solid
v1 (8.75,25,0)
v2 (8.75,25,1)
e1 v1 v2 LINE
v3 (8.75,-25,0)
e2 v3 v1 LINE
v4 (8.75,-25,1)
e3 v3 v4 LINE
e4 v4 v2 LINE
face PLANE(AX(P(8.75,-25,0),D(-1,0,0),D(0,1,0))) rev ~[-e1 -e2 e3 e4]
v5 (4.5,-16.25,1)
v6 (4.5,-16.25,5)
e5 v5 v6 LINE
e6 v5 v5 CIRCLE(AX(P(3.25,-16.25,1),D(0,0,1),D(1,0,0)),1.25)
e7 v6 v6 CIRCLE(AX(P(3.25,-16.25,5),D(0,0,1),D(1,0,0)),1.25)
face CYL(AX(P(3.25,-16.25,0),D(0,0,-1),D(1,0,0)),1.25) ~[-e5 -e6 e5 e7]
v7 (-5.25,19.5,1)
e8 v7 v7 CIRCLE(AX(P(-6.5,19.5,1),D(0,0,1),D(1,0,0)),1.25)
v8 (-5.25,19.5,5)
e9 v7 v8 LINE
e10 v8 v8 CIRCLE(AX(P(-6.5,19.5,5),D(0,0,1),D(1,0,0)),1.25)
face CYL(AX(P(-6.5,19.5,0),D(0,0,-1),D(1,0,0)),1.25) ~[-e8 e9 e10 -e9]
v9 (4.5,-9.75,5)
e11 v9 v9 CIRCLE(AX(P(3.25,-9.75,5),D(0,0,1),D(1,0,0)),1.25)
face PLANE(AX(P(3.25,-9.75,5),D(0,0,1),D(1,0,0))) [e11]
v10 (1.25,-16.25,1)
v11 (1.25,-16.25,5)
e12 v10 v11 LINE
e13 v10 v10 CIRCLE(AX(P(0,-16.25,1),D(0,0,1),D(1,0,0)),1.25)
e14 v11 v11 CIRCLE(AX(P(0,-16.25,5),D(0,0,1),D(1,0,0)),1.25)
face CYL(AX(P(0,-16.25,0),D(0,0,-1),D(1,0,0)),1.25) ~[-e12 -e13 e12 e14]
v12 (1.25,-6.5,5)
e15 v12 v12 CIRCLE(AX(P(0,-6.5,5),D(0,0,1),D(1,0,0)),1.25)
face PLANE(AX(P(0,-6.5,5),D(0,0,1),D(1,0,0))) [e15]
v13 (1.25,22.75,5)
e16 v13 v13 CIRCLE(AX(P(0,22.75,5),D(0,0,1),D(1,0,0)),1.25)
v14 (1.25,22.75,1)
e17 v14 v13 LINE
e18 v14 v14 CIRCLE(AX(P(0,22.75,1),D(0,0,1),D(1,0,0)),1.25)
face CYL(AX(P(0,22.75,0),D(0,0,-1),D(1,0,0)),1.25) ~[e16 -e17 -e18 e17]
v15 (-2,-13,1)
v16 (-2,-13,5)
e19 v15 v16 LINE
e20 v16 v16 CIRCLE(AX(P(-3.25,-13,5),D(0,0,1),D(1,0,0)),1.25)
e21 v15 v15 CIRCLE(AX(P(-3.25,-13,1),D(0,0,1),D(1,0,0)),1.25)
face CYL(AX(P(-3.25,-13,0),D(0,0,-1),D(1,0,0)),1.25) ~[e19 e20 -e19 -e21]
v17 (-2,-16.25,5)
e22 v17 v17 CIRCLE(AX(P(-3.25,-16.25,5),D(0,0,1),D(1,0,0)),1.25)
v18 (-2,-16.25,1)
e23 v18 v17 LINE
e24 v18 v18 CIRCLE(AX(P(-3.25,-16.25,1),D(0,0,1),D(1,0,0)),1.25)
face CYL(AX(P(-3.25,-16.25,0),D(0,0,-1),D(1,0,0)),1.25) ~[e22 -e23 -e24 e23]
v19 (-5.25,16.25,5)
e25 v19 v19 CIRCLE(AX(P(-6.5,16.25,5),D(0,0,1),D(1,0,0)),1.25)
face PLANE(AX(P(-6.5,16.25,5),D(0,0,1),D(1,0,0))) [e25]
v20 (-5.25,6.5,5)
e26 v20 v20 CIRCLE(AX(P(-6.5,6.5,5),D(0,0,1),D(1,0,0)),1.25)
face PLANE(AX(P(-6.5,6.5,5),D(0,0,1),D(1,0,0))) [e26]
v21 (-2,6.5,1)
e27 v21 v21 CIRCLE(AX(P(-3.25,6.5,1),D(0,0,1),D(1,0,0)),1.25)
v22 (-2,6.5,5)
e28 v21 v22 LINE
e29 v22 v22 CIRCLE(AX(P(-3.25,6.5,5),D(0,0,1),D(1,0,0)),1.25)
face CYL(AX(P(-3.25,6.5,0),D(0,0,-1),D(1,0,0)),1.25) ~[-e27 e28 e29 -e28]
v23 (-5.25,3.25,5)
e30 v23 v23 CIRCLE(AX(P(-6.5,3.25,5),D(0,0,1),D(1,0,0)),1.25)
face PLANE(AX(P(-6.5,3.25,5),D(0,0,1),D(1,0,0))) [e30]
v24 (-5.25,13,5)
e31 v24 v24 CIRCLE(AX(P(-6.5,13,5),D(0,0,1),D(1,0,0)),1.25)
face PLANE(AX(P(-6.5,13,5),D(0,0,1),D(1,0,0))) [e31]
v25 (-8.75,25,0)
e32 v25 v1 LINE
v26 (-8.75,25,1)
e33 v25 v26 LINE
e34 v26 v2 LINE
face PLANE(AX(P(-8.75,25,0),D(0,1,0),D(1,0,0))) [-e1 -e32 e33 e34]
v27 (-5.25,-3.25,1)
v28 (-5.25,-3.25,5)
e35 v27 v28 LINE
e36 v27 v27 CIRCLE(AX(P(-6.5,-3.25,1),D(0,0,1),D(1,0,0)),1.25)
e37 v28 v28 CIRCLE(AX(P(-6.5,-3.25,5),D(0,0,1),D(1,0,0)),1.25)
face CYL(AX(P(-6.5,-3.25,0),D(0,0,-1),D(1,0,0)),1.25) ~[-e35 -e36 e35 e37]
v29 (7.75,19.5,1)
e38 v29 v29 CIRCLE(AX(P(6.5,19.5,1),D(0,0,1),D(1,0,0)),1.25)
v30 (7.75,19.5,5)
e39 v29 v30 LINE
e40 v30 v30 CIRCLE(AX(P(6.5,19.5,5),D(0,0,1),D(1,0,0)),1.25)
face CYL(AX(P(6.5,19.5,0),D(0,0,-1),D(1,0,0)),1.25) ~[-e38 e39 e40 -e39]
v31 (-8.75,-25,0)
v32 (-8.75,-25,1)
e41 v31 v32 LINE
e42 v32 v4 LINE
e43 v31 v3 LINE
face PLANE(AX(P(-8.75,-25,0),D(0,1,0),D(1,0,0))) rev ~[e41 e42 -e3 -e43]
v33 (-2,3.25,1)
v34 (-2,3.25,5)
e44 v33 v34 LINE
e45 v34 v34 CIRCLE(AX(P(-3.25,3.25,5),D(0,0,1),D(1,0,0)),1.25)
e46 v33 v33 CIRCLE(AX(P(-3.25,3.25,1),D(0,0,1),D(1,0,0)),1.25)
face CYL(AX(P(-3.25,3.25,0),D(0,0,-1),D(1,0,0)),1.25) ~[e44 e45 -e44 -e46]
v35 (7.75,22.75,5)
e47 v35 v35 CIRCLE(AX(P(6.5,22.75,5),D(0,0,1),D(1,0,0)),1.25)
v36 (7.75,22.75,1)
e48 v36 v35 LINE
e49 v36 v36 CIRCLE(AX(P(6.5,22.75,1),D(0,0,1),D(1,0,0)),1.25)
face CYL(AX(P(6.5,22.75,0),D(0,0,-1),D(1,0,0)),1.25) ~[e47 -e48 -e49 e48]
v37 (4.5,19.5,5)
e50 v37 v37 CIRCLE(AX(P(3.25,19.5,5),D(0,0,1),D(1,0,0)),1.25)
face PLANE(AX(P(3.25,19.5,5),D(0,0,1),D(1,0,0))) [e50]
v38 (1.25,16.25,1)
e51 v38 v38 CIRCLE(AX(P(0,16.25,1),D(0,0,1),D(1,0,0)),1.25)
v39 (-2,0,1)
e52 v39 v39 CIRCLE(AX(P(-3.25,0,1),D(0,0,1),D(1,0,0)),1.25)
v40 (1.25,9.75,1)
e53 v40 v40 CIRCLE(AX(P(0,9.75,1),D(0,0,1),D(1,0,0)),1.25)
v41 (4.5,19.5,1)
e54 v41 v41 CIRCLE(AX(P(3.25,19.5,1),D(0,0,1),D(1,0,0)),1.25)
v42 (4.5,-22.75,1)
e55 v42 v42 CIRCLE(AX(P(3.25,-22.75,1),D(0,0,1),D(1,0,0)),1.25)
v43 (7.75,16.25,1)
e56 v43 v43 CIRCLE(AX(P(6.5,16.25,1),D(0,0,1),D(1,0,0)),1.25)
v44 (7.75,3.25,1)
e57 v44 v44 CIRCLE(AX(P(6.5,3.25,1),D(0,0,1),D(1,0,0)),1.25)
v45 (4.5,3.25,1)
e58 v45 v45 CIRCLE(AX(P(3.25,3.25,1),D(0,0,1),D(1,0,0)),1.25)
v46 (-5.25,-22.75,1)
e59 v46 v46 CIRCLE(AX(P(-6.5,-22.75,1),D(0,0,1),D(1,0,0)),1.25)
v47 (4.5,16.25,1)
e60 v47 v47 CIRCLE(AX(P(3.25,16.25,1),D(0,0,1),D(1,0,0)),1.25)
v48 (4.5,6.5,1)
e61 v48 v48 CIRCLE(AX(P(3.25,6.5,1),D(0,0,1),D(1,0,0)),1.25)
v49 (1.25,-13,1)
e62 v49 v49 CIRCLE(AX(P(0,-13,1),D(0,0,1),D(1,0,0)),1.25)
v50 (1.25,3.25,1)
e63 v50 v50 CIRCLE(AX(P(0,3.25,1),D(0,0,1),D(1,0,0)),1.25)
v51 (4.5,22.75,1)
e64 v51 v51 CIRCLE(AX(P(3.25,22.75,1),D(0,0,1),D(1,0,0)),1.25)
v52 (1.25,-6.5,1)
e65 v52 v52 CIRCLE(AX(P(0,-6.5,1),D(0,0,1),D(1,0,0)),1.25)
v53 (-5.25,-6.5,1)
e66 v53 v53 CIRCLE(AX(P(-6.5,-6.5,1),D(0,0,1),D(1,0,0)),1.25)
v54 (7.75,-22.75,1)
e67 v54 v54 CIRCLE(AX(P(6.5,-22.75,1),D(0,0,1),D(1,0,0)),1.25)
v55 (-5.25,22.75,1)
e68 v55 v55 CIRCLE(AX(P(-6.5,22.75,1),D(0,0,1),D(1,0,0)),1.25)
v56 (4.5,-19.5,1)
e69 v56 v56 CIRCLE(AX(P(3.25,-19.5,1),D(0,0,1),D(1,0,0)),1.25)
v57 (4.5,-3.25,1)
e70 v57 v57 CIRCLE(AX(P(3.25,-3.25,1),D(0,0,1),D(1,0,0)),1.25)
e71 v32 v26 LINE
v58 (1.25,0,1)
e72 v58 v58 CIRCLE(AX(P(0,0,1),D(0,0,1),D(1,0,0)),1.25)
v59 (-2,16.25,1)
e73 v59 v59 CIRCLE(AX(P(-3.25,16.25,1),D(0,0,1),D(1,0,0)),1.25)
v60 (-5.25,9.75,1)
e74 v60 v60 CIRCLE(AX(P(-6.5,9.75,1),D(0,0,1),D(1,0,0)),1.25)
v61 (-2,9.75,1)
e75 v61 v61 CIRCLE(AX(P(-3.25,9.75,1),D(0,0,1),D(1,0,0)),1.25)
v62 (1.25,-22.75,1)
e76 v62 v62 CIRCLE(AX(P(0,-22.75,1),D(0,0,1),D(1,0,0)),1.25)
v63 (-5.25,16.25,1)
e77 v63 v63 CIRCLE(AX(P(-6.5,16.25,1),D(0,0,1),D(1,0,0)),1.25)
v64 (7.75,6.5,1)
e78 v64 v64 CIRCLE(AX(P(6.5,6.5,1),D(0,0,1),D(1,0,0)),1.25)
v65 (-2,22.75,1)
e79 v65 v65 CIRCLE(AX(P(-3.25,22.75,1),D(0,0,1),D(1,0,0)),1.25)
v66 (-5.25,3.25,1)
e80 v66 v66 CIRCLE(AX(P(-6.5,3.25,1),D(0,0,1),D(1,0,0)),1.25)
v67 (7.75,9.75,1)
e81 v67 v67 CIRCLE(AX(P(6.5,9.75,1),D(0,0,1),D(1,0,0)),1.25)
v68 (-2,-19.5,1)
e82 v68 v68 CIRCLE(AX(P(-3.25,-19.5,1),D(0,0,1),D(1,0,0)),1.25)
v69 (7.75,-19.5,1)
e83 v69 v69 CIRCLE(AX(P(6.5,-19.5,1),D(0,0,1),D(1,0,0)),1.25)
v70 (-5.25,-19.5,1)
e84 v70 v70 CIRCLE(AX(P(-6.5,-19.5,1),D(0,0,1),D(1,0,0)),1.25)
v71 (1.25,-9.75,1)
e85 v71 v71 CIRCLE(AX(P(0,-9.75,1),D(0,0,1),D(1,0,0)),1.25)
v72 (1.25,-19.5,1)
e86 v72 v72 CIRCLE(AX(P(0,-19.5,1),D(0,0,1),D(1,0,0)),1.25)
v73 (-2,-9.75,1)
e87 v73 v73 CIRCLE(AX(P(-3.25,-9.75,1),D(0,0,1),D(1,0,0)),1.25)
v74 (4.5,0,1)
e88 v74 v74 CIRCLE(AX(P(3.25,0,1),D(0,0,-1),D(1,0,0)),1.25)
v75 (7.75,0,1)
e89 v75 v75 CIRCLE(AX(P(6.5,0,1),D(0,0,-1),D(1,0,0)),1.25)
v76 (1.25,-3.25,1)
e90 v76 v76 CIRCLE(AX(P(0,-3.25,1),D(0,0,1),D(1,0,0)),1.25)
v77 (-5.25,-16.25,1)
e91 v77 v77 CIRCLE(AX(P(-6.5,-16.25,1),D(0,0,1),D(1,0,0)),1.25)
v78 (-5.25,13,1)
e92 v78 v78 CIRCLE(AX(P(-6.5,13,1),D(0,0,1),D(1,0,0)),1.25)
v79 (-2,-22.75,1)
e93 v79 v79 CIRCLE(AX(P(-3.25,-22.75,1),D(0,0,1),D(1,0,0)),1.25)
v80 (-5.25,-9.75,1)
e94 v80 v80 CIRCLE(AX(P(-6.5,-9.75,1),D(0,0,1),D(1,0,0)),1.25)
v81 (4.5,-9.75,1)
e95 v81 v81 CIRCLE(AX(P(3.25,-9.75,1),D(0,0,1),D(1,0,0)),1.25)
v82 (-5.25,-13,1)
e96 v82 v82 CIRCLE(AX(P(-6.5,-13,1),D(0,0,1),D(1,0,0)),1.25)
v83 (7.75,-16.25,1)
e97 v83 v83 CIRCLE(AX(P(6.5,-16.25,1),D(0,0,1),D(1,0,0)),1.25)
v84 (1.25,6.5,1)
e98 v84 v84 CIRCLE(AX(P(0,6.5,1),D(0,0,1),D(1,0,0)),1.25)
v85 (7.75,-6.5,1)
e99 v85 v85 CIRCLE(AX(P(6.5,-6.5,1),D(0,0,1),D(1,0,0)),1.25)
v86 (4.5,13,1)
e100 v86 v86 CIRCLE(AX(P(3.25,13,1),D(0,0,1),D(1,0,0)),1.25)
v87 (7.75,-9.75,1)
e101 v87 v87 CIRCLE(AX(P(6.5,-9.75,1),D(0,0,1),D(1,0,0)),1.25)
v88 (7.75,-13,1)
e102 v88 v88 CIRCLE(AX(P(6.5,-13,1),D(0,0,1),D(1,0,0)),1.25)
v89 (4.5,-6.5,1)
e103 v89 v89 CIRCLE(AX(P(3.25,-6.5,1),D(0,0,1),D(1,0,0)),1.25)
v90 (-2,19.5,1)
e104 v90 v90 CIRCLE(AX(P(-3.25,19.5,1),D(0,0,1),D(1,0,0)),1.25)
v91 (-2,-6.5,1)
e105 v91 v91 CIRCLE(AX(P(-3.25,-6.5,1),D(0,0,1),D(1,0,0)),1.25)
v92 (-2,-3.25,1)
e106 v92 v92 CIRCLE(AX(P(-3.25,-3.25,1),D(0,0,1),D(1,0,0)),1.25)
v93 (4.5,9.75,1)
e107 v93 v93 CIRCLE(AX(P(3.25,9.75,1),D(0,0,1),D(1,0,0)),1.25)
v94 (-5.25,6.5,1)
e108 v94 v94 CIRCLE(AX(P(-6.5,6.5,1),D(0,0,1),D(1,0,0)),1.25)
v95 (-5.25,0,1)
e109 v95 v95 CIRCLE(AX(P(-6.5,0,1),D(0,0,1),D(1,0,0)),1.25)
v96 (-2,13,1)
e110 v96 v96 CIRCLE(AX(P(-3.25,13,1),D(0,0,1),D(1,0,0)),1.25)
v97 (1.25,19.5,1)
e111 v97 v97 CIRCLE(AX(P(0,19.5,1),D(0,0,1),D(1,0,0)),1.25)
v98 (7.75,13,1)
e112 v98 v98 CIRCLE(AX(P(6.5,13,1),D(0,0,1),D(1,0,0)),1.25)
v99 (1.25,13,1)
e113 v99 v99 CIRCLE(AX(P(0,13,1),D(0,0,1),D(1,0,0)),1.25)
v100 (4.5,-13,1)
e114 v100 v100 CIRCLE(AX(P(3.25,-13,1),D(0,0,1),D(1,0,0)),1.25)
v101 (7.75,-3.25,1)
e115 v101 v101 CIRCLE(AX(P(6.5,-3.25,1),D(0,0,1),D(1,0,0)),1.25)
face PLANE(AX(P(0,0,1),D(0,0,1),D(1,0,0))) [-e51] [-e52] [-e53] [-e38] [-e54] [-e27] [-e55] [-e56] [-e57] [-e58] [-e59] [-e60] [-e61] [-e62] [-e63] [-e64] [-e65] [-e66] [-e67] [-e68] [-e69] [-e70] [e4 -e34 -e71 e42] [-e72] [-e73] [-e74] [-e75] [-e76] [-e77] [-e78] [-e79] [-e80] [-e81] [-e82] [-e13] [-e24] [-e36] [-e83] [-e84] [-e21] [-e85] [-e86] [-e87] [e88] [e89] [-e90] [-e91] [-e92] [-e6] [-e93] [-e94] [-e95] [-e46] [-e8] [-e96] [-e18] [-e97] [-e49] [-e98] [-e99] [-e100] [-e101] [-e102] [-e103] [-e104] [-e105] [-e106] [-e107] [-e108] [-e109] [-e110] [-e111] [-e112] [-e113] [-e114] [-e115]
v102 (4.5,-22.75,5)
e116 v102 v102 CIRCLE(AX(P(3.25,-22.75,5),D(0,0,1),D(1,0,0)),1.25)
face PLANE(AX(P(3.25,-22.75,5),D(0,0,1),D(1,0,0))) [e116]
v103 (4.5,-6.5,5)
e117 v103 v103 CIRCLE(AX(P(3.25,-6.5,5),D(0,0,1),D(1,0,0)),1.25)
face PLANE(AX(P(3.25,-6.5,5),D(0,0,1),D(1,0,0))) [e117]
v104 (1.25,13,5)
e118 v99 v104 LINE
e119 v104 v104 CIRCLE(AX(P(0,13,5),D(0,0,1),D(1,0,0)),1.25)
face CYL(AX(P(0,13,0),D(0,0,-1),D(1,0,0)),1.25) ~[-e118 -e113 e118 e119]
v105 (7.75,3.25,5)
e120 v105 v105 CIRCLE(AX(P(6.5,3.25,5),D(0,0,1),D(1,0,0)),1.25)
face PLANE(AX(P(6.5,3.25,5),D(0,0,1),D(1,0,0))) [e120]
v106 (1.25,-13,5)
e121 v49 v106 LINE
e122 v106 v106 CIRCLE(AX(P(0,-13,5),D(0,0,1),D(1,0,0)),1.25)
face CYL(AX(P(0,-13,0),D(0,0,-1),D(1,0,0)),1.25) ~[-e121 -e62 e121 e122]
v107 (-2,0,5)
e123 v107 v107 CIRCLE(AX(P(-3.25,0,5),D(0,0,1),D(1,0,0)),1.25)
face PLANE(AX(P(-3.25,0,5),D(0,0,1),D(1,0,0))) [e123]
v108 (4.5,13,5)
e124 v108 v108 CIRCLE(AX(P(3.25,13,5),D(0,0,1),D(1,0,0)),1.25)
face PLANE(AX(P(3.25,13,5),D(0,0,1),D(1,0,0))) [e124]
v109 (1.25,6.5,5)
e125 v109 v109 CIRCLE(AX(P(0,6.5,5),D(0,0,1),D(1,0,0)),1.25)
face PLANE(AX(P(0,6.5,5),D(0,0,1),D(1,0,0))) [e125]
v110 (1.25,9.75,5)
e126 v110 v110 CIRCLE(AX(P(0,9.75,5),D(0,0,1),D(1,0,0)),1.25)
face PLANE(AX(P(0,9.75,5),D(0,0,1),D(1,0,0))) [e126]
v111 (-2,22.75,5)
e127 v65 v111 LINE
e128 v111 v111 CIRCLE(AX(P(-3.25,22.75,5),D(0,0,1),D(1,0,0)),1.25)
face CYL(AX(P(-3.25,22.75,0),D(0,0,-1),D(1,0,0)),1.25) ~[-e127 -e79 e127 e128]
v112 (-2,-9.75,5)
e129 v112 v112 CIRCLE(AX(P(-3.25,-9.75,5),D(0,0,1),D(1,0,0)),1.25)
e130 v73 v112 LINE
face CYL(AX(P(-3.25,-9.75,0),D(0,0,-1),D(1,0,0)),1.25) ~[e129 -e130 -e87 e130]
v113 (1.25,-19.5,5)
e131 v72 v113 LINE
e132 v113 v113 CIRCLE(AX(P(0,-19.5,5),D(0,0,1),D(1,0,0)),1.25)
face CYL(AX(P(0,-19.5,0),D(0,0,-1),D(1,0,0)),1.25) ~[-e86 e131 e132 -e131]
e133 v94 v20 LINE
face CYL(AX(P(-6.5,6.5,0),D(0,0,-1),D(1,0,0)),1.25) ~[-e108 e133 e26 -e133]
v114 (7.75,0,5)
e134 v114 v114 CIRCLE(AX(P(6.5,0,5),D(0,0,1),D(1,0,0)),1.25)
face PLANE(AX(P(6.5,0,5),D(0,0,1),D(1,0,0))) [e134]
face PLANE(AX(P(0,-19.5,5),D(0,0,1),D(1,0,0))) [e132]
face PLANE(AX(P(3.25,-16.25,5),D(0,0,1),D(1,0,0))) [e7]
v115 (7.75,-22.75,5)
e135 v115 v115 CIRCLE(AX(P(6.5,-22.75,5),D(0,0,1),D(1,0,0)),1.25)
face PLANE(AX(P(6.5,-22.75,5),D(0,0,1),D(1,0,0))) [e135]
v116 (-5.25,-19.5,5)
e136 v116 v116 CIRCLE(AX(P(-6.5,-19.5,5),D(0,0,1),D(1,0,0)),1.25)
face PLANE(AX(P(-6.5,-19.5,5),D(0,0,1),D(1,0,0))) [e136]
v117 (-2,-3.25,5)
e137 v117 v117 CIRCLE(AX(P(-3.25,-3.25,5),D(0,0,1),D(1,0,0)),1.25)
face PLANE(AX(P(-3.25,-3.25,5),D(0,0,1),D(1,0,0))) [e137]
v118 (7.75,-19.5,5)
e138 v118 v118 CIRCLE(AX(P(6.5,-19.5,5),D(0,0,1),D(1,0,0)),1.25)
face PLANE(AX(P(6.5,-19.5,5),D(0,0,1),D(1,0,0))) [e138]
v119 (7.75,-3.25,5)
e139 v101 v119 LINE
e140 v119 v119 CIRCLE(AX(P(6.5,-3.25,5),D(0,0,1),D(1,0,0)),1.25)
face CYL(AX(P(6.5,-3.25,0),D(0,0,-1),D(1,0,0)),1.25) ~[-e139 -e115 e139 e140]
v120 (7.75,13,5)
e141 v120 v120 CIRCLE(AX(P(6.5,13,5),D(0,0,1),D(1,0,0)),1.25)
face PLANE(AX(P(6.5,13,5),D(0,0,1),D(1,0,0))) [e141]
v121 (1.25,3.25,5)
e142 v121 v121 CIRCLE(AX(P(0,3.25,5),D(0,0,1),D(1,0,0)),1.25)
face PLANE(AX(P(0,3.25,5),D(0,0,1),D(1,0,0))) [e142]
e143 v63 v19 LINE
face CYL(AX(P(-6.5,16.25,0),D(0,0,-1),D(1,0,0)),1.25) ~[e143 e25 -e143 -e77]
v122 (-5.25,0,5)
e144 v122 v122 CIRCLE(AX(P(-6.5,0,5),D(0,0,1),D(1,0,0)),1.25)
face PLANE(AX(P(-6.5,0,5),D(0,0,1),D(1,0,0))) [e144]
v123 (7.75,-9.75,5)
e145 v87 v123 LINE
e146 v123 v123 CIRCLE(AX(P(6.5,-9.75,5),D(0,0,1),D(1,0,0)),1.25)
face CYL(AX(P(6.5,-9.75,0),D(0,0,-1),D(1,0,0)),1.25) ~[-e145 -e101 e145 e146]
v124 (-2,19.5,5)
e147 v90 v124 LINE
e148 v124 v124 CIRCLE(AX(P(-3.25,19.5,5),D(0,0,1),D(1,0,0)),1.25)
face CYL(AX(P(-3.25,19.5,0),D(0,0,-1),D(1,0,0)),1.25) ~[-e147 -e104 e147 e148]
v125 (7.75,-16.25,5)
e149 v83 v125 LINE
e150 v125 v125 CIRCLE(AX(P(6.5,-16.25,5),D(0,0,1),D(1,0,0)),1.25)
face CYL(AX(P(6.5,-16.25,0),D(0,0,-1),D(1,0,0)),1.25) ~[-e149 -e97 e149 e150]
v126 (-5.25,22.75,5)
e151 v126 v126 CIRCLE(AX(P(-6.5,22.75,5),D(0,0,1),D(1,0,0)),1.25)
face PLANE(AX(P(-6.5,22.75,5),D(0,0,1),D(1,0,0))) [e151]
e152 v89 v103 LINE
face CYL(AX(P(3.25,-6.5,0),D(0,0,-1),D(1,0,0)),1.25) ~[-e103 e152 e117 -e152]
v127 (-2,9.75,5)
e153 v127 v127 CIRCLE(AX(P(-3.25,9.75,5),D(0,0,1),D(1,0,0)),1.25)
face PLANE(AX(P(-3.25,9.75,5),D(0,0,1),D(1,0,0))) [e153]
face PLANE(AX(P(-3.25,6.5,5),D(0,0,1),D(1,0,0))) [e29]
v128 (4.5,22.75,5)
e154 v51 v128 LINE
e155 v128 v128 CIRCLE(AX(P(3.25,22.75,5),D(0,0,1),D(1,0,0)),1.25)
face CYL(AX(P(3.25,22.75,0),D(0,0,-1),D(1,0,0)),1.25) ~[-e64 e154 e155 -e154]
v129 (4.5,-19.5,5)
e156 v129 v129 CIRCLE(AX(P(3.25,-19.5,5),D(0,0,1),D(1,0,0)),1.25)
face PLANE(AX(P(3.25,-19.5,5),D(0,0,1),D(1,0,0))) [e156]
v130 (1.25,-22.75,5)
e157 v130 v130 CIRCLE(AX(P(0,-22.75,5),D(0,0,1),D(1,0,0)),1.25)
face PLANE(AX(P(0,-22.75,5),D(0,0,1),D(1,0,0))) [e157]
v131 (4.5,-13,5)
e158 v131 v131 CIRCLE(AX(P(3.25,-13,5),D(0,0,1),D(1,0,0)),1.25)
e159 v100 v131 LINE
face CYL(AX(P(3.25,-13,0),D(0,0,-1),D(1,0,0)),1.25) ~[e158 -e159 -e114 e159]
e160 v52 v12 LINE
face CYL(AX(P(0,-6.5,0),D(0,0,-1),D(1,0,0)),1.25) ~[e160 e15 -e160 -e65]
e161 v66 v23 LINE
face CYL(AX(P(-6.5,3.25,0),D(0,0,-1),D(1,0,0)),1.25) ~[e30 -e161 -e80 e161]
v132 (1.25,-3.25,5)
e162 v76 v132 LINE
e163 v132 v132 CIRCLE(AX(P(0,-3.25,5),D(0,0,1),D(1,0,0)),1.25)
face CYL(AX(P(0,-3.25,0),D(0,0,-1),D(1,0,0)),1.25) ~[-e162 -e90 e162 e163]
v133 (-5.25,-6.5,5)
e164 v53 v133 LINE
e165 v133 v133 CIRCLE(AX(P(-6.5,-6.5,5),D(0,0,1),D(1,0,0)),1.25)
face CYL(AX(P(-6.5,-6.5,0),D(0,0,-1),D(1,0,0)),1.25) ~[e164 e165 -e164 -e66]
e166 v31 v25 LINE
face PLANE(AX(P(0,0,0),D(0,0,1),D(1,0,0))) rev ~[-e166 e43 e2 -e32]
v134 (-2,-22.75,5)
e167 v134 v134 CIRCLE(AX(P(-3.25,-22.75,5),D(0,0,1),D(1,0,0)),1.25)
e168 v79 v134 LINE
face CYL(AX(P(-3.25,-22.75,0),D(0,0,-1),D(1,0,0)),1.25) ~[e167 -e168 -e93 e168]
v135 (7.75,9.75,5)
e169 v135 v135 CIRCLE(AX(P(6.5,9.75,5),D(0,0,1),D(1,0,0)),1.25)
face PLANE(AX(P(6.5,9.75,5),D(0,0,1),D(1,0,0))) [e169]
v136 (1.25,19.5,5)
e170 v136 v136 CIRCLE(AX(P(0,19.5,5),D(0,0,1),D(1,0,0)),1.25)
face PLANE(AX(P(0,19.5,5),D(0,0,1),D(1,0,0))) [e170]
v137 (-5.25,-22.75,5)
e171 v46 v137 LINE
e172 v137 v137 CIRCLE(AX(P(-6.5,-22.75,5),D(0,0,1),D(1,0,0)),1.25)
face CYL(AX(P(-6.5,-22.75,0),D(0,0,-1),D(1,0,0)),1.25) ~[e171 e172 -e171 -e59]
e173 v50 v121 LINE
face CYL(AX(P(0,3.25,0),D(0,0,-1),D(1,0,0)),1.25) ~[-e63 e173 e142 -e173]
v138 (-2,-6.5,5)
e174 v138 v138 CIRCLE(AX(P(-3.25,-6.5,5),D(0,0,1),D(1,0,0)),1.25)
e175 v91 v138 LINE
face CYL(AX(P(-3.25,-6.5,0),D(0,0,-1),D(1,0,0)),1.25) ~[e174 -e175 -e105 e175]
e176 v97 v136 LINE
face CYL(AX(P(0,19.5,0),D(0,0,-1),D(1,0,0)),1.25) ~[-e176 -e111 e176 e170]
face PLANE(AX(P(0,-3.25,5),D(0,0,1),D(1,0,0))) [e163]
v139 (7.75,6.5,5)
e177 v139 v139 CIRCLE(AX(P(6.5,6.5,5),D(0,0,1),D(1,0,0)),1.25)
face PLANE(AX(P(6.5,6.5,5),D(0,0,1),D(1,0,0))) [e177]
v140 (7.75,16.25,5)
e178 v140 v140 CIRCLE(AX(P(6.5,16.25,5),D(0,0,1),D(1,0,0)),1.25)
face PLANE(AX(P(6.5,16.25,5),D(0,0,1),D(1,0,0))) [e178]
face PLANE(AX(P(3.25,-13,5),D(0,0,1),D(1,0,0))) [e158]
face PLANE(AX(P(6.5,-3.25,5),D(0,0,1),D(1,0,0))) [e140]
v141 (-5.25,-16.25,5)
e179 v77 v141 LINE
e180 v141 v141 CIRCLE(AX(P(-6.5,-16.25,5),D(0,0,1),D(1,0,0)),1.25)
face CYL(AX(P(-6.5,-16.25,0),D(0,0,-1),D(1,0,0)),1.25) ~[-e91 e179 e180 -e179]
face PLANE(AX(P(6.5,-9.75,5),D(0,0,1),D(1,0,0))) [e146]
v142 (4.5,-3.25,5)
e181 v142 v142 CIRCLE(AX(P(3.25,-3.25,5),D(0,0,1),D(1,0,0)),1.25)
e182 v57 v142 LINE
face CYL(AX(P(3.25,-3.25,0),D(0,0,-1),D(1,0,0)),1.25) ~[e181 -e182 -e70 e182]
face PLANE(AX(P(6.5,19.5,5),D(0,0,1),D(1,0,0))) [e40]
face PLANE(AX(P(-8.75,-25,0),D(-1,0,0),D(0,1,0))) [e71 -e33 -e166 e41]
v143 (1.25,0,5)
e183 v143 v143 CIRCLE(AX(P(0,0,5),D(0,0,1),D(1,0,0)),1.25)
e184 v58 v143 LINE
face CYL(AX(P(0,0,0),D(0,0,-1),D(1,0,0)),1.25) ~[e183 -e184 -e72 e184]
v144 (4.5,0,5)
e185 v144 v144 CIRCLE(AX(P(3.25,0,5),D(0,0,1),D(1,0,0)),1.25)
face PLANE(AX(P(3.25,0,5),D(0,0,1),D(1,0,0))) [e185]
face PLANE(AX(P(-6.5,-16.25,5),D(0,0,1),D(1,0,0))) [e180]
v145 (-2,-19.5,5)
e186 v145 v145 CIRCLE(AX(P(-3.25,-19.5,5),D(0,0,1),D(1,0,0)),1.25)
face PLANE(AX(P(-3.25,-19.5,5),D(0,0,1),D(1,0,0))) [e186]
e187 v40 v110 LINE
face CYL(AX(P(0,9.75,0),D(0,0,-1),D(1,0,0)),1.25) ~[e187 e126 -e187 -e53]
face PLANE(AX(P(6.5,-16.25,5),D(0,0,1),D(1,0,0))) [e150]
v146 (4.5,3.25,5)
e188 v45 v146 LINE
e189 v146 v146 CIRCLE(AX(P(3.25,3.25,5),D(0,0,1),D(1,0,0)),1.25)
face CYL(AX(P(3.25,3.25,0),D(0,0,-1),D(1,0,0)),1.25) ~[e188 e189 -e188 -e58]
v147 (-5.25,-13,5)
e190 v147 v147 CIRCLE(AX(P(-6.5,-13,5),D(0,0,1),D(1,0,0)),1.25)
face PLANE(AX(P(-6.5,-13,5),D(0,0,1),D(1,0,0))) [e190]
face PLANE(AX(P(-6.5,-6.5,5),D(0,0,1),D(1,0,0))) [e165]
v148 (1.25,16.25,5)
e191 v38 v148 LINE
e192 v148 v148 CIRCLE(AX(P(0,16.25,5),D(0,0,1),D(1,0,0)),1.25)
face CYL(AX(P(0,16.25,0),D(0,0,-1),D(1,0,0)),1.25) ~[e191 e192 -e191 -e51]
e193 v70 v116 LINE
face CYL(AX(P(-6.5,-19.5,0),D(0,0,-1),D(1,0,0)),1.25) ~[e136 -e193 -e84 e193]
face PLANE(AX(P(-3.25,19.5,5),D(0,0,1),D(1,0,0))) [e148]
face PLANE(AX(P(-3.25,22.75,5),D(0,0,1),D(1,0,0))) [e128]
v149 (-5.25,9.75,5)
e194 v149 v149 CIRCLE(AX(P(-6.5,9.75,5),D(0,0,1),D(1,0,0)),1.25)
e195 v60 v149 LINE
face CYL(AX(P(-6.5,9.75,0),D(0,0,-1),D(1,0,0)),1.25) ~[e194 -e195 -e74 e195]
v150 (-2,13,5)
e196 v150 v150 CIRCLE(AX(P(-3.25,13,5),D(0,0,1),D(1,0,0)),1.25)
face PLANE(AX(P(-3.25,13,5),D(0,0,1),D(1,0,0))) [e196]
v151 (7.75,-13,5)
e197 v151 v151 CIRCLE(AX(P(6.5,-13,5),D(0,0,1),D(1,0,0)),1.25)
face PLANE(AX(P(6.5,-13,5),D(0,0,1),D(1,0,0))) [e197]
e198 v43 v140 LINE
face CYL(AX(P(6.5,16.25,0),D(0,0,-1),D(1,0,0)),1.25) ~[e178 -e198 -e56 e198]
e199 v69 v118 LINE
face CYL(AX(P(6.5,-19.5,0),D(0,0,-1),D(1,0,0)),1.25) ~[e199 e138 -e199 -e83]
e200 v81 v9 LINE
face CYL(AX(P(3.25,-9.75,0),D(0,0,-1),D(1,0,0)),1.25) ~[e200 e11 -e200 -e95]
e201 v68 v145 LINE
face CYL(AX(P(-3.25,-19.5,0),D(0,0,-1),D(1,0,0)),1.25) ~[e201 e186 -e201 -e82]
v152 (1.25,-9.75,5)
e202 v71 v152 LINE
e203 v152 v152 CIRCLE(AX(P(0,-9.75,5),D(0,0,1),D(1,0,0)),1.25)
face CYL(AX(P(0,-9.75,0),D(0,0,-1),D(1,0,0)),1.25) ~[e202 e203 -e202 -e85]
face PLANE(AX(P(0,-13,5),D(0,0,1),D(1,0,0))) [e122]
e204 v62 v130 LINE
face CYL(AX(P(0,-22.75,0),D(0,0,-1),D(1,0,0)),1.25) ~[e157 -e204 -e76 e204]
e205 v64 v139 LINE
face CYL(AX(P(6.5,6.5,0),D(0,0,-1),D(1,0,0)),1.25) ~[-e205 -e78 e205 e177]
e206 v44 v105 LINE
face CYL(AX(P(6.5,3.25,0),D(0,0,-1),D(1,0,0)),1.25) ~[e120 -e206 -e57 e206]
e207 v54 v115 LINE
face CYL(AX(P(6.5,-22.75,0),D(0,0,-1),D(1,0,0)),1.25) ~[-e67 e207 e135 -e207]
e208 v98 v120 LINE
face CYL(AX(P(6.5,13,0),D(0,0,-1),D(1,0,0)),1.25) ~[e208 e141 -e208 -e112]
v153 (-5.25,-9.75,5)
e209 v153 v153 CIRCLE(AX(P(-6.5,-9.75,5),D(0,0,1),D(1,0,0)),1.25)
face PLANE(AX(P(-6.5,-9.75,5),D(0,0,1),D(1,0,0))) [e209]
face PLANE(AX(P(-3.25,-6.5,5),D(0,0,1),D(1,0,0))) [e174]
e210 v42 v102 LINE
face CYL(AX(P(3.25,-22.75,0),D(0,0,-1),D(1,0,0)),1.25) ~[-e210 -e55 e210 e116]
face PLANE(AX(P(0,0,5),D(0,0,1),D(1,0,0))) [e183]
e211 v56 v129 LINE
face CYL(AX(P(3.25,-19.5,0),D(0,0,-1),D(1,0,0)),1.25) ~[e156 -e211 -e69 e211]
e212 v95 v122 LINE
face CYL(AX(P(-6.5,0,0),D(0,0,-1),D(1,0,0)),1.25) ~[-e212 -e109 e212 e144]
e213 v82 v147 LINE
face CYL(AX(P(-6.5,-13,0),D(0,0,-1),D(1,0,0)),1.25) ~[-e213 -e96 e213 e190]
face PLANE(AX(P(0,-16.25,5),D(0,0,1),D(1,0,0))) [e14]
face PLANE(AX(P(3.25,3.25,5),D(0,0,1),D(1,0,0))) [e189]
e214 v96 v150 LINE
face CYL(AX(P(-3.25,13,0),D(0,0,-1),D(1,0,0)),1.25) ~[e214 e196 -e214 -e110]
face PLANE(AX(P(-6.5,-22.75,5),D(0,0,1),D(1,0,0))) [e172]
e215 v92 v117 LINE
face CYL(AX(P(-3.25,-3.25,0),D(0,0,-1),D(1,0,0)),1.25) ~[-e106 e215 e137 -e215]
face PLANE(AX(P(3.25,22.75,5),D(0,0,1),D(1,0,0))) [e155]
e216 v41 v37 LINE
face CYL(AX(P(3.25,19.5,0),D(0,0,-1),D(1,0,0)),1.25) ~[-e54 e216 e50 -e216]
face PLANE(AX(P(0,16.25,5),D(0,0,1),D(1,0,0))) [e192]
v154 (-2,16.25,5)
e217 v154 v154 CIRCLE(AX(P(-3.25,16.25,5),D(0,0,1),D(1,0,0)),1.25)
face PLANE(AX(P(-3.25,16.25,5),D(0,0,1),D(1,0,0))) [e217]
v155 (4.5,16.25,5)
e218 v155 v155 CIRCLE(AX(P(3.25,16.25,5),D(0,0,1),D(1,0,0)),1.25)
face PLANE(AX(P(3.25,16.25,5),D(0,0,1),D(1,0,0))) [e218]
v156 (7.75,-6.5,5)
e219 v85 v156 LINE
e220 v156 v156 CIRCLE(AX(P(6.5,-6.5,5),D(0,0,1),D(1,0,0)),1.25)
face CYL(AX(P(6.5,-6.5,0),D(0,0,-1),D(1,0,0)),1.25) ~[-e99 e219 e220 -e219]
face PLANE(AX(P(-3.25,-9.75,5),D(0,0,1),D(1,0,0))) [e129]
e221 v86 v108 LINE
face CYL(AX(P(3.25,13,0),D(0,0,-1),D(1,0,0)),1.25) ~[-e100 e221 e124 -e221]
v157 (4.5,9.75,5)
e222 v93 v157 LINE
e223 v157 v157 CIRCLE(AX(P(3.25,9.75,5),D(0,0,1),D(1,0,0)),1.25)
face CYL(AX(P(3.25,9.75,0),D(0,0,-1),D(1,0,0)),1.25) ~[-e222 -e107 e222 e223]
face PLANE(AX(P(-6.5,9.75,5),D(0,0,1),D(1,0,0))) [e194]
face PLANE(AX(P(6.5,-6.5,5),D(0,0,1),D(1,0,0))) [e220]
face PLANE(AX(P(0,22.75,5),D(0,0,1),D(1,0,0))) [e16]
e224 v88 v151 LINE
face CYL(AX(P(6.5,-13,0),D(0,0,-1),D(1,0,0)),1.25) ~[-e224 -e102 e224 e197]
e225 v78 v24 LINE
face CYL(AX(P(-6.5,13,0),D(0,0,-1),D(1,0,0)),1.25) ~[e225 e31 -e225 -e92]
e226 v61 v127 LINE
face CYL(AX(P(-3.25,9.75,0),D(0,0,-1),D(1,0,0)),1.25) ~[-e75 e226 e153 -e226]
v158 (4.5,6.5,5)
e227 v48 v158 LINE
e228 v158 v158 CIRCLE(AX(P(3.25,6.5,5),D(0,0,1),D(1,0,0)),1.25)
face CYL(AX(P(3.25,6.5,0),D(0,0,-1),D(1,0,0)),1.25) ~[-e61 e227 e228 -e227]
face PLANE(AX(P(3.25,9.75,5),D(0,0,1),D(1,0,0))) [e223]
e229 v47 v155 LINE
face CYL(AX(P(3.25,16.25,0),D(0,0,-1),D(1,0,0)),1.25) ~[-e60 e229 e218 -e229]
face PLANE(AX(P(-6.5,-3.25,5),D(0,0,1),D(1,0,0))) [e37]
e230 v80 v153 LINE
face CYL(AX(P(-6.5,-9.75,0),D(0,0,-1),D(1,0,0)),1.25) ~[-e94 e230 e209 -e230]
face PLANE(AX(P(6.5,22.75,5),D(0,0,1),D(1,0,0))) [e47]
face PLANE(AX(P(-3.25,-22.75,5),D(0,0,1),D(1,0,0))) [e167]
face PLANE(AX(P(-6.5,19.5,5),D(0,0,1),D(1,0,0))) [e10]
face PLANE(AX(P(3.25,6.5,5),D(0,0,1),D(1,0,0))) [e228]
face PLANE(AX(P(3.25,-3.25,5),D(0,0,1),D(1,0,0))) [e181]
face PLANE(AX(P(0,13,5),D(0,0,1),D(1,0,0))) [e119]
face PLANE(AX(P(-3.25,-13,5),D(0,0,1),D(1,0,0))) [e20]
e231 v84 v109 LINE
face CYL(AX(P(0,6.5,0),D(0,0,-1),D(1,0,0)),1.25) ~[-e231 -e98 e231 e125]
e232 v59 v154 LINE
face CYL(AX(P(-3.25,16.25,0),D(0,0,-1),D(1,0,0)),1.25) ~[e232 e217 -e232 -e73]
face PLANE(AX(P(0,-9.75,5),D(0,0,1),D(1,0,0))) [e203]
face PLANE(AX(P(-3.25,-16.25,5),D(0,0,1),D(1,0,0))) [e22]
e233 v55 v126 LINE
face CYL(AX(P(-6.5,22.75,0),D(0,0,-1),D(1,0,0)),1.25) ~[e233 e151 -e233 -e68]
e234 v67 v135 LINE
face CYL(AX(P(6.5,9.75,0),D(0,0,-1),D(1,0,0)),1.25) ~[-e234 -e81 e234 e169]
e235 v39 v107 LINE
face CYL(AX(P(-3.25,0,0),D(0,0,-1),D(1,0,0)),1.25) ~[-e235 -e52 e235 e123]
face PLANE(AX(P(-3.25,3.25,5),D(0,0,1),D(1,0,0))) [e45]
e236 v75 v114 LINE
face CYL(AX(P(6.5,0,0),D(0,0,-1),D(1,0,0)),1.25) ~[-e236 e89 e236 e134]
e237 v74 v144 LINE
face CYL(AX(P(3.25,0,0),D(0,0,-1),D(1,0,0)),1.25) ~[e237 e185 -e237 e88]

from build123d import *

# Parameters (mm, degrees)
F0_W     = 17.5
F0_H     = 50
F0_R     = 1.25
F1_DEPTH = 1
F2_DEPTH = 5


with BuildPart() as f1:
    # F0 (on Top) → F1 (new body)
    with BuildSketch(Plane.XY):
        Rectangle(F0_W, F0_H)
        with Locations((-6.5, -22.75)):
            Circle(F0_R, mode=Mode.SUBTRACT)
        with Locations((-6.5, -19.5)):
            Circle(F0_R, mode=Mode.SUBTRACT)
        with Locations((-6.5, -16.25)):
            Circle(F0_R, mode=Mode.SUBTRACT)
        with Locations((-6.5, -13)):
            Circle(F0_R, mode=Mode.SUBTRACT)
        with Locations((-3.25, -22.75)):
            Circle(F0_R, mode=Mode.SUBTRACT)
        with Locations((-3.25, -19.5)):
            Circle(F0_R, mode=Mode.SUBTRACT)
        with Locations((-3.25, -16.25)):
            Circle(F0_R, mode=Mode.SUBTRACT)
        with Locations((-3.25, -13)):
            Circle(F0_R, mode=Mode.SUBTRACT)
        with Locations((-6.5, -9.75)):
            Circle(F0_R, mode=Mode.SUBTRACT)
        with Locations((-6.5, -6.5)):
            Circle(F0_R, mode=Mode.SUBTRACT)
        with Locations((-6.5, -3.25)):
            Circle(F0_R, mode=Mode.SUBTRACT)
        with Locations((-3.25, -9.75)):
            Circle(F0_R, mode=Mode.SUBTRACT)
        with Locations((-3.25, -6.5)):
            Circle(F0_R, mode=Mode.SUBTRACT)
        with Locations((-3.25, -3.25)):
            Circle(F0_R, mode=Mode.SUBTRACT)
        with Locations((0, -22.75)):
            Circle(F0_R, mode=Mode.SUBTRACT)
        with Locations((0, -19.5)):
            Circle(F0_R, mode=Mode.SUBTRACT)
        with Locations((3.25, -22.75)):
            Circle(F0_R, mode=Mode.SUBTRACT)
        with Locations((3.25, -19.5)):
            Circle(F0_R, mode=Mode.SUBTRACT)
        with Locations((0, -16.25)):
            Circle(F0_R, mode=Mode.SUBTRACT)
        with Locations((0, -13)):
            Circle(F0_R, mode=Mode.SUBTRACT)
        with Locations((3.25, -16.25)):
            Circle(F0_R, mode=Mode.SUBTRACT)
        with Locations((3.25, -13)):
            Circle(F0_R, mode=Mode.SUBTRACT)
        with Locations((6.5, -22.75)):
            Circle(F0_R, mode=Mode.SUBTRACT)
        with Locations((6.5, -19.5)):
            Circle(F0_R, mode=Mode.SUBTRACT)
        with Locations((6.5, -16.25)):
            Circle(F0_R, mode=Mode.SUBTRACT)
        with Locations((6.5, -13)):
            Circle(F0_R, mode=Mode.SUBTRACT)
        with Locations((0, -9.75)):
            Circle(F0_R, mode=Mode.SUBTRACT)
        with Locations((0, -6.5)):
            Circle(F0_R, mode=Mode.SUBTRACT)
        with Locations((3.25, -9.75)):
            Circle(F0_R, mode=Mode.SUBTRACT)
        with Locations((3.25, -6.5)):
            Circle(F0_R, mode=Mode.SUBTRACT)
        with Locations((0, -3.25)):
            Circle(F0_R, mode=Mode.SUBTRACT)
        with Locations((3.25, -3.25)):
            Circle(F0_R, mode=Mode.SUBTRACT)
        with Locations((6.5, -9.75)):
            Circle(F0_R, mode=Mode.SUBTRACT)
        with Locations((6.5, -6.5)):
            Circle(F0_R, mode=Mode.SUBTRACT)
        with Locations((6.5, -3.25)):
            Circle(F0_R, mode=Mode.SUBTRACT)
        with Locations((-6.5, 0)):
            Circle(F0_R, mode=Mode.SUBTRACT)
        with Locations((-6.5, 3.25)):
            Circle(F0_R, mode=Mode.SUBTRACT)
        with Locations((-6.5, 6.5)):
            Circle(F0_R, mode=Mode.SUBTRACT)
        with Locations((-6.5, 9.75)):
            Circle(F0_R, mode=Mode.SUBTRACT)
        with Locations((-3.25, 0)):
            Circle(F0_R, mode=Mode.SUBTRACT)
        with Locations((-3.25, 3.25)):
            Circle(F0_R, mode=Mode.SUBTRACT)
        with Locations((-3.25, 6.5)):
            Circle(F0_R, mode=Mode.SUBTRACT)
        with Locations((-3.25, 9.75)):
            Circle(F0_R, mode=Mode.SUBTRACT)
        with Locations((-6.5, 13)):
            Circle(F0_R, mode=Mode.SUBTRACT)
        with Locations((-6.5, 16.25)):
            Circle(F0_R, mode=Mode.SUBTRACT)
        with Locations((-6.5, 19.5)):
            Circle(F0_R, mode=Mode.SUBTRACT)
        with Locations((-6.5, 22.75)):
            Circle(F0_R, mode=Mode.SUBTRACT)
        with Locations((-3.25, 13)):
            Circle(F0_R, mode=Mode.SUBTRACT)
        with Locations((-3.25, 16.25)):
            Circle(F0_R, mode=Mode.SUBTRACT)
        with Locations((-3.25, 19.5)):
            Circle(F0_R, mode=Mode.SUBTRACT)
        with Locations((-3.25, 22.75)):
            Circle(F0_R, mode=Mode.SUBTRACT)
        Circle(F0_R, mode=Mode.SUBTRACT)
        with Locations((0, 3.25)):
            Circle(F0_R, mode=Mode.SUBTRACT)
        with Locations((3.25, 0)):
            Circle(F0_R, mode=Mode.SUBTRACT)
        with Locations((3.25, 3.25)):
            Circle(F0_R, mode=Mode.SUBTRACT)
        with Locations((0, 6.5)):
            Circle(F0_R, mode=Mode.SUBTRACT)
        with Locations((0, 9.75)):
            Circle(F0_R, mode=Mode.SUBTRACT)
        with Locations((3.25, 6.5)):
            Circle(F0_R, mode=Mode.SUBTRACT)
        with Locations((3.25, 9.75)):
            Circle(F0_R, mode=Mode.SUBTRACT)
        with Locations((6.5, 0)):
            Circle(F0_R, mode=Mode.SUBTRACT)
        with Locations((6.5, 3.25)):
            Circle(F0_R, mode=Mode.SUBTRACT)
        with Locations((6.5, 6.5)):
            Circle(F0_R, mode=Mode.SUBTRACT)
        with Locations((6.5, 9.75)):
            Circle(F0_R, mode=Mode.SUBTRACT)
        with Locations((0, 13)):
            Circle(F0_R, mode=Mode.SUBTRACT)
        with Locations((0, 16.25)):
            Circle(F0_R, mode=Mode.SUBTRACT)
        with Locations((3.25, 13)):
            Circle(F0_R, mode=Mode.SUBTRACT)
        with Locations((3.25, 16.25)):
            Circle(F0_R, mode=Mode.SUBTRACT)
        with Locations((0, 19.5)):
            Circle(F0_R, mode=Mode.SUBTRACT)
        with Locations((0, 22.75)):
            Circle(F0_R, mode=Mode.SUBTRACT)
        with Locations((3.25, 19.5)):
            Circle(F0_R, mode=Mode.SUBTRACT)
        with Locations((3.25, 22.75)):
            Circle(F0_R, mode=Mode.SUBTRACT)
        with Locations((6.5, 13)):
            Circle(F0_R, mode=Mode.SUBTRACT)
        with Locations((6.5, 16.25)):
            Circle(F0_R, mode=Mode.SUBTRACT)
        with Locations((6.5, 19.5)):
            Circle(F0_R, mode=Mode.SUBTRACT)
        with Locations((6.5, 22.75)):
            Circle(F0_R, mode=Mode.SUBTRACT)
        with Locations((3.25, 0)):
            Circle(F0_R)
        with Locations((6.5, 0)):
            Circle(F0_R)
    extrude(amount=F1_DEPTH)

    # F0 (on Top) → F2 (join)
    with BuildSketch(Plane.XY):
        Circle(F0_R)
        with Locations((0, 3.25)):
            Circle(F0_R)
        with Locations((0, 6.5)):
            Circle(F0_R)
        with Locations((0, 9.75)):
            Circle(F0_R)
        with Locations((0, 13)):
            Circle(F0_R)
        with Locations((0, 16.25)):
            Circle(F0_R)
        with Locations((0, 19.5)):
            Circle(F0_R)
        with Locations((0, 22.75)):
            Circle(F0_R)
        with Locations((3.25, 0)):
            Circle(F0_R)
        with Locations((3.25, 3.25)):
            Circle(F0_R)
        with Locations((3.25, 6.5)):
            Circle(F0_R)
        with Locations((3.25, 9.75)):
            Circle(F0_R)
        with Locations((3.25, 13)):
            Circle(F0_R)
        with Locations((3.25, 16.25)):
            Circle(F0_R)
        with Locations((3.25, 19.5)):
            Circle(F0_R)
        with Locations((3.25, 22.75)):
            Circle(F0_R)
        with Locations((6.5, 0)):
            Circle(F0_R)
        with Locations((6.5, 3.25)):
            Circle(F0_R)
        with Locations((6.5, 6.5)):
            Circle(F0_R)
        with Locations((6.5, 9.75)):
            Circle(F0_R)
        with Locations((6.5, 13)):
            Circle(F0_R)
        with Locations((6.5, 16.25)):
            Circle(F0_R)
        with Locations((6.5, 19.5)):
            Circle(F0_R)
        with Locations((6.5, 22.75)):
            Circle(F0_R)
        with Locations((-3.25, 19.5)):
            Circle(F0_R)
        with Locations((-6.5, 9.75)):
            Circle(F0_R)
        with Locations((-6.5, 6.5)):
            Circle(F0_R)
        with Locations((-6.5, 16.25)):
            Circle(F0_R)
        with Locations((-6.5, 3.25)):
            Circle(F0_R)
        with Locations((-6.5, 22.75)):
            Circle(F0_R)
        with Locations((-6.5, 13)):
            Circle(F0_R)
        with Locations((-3.25, 13)):
            Circle(F0_R)
        with Locations((-3.25, 9.75)):
            Circle(F0_R)
        with Locations((-3.25, 6.5)):
            Circle(F0_R)
        with Locations((-3.25, 16.25)):
            Circle(F0_R)
        with Locations((-3.25, 3.25)):
            Circle(F0_R)
        with Locations((-3.25, 22.75)):
            Circle(F0_R)
        with Locations((-6.5, 19.5)):
            Circle(F0_R)
        with Locations((-3.25, -22.75)):
            Circle(F0_R)
        with Locations((-3.25, -19.5)):
            Circle(F0_R)
        with Locations((-3.25, -9.75)):
            Circle(F0_R)
        with Locations((-6.5, -16.25)):
            Circle(F0_R)
        with Locations((-3.25, -6.5)):
            Circle(F0_R)
        with Locations((-3.25, -16.25)):
            Circle(F0_R)
        with Locations((-3.25, -3.25)):
            Circle(F0_R)
        with Locations((-6.5, -9.75)):
            Circle(F0_R)
        with Locations((-6.5, -19.5)):
            Circle(F0_R)
        with Locations((-6.5, -22.75)):
            Circle(F0_R)
        with Locations((-6.5, -13)):
            Circle(F0_R)
        with Locations((-6.5, -6.5)):
            Circle(F0_R)
        with Locations((-6.5, -3.25)):
            Circle(F0_R)
        with Locations((-3.25, -13)):
            Circle(F0_R)
        with Locations((3.25, -13)):
            Circle(F0_R)
        with Locations((3.25, -9.75)):
            Circle(F0_R)
        with Locations((6.5, -16.25)):
            Circle(F0_R)
        with Locations((3.25, -6.5)):
            Circle(F0_R)
        with Locations((3.25, -3.25)):
            Circle(F0_R)
        with Locations((3.25, -22.75)):
            Circle(F0_R)
        with Locations((3.25, -19.5)):
            Circle(F0_R)
        with Locations((6.5, -6.5)):
            Circle(F0_R)
        with Locations((6.5, -19.5)):
            Circle(F0_R)
        with Locations((6.5, -13)):
            Circle(F0_R)
        with Locations((6.5, -3.25)):
            Circle(F0_R)
        with Locations((6.5, -22.75)):
            Circle(F0_R)
        with Locations((3.25, -16.25)):
            Circle(F0_R)
        with Locations((6.5, -9.75)):
            Circle(F0_R)
        with Locations((0, -6.5)):
            Circle(F0_R)
        with Locations((0, -9.75)):
            Circle(F0_R)
        with Locations((0, -22.75)):
            Circle(F0_R)
        with Locations((0, -19.5)):
            Circle(F0_R)
        with Locations((0, -16.25)):
            Circle(F0_R)
        with Locations((0, -13)):
            Circle(F0_R)
        with Locations((0, -3.25)):
            Circle(F0_R)
        with Locations((-6.5, 0)):
            Circle(F0_R)
        with Locations((-3.25, 0)):
            Circle(F0_R)
    extrude(amount=F2_DEPTH)


solid = f1.part
